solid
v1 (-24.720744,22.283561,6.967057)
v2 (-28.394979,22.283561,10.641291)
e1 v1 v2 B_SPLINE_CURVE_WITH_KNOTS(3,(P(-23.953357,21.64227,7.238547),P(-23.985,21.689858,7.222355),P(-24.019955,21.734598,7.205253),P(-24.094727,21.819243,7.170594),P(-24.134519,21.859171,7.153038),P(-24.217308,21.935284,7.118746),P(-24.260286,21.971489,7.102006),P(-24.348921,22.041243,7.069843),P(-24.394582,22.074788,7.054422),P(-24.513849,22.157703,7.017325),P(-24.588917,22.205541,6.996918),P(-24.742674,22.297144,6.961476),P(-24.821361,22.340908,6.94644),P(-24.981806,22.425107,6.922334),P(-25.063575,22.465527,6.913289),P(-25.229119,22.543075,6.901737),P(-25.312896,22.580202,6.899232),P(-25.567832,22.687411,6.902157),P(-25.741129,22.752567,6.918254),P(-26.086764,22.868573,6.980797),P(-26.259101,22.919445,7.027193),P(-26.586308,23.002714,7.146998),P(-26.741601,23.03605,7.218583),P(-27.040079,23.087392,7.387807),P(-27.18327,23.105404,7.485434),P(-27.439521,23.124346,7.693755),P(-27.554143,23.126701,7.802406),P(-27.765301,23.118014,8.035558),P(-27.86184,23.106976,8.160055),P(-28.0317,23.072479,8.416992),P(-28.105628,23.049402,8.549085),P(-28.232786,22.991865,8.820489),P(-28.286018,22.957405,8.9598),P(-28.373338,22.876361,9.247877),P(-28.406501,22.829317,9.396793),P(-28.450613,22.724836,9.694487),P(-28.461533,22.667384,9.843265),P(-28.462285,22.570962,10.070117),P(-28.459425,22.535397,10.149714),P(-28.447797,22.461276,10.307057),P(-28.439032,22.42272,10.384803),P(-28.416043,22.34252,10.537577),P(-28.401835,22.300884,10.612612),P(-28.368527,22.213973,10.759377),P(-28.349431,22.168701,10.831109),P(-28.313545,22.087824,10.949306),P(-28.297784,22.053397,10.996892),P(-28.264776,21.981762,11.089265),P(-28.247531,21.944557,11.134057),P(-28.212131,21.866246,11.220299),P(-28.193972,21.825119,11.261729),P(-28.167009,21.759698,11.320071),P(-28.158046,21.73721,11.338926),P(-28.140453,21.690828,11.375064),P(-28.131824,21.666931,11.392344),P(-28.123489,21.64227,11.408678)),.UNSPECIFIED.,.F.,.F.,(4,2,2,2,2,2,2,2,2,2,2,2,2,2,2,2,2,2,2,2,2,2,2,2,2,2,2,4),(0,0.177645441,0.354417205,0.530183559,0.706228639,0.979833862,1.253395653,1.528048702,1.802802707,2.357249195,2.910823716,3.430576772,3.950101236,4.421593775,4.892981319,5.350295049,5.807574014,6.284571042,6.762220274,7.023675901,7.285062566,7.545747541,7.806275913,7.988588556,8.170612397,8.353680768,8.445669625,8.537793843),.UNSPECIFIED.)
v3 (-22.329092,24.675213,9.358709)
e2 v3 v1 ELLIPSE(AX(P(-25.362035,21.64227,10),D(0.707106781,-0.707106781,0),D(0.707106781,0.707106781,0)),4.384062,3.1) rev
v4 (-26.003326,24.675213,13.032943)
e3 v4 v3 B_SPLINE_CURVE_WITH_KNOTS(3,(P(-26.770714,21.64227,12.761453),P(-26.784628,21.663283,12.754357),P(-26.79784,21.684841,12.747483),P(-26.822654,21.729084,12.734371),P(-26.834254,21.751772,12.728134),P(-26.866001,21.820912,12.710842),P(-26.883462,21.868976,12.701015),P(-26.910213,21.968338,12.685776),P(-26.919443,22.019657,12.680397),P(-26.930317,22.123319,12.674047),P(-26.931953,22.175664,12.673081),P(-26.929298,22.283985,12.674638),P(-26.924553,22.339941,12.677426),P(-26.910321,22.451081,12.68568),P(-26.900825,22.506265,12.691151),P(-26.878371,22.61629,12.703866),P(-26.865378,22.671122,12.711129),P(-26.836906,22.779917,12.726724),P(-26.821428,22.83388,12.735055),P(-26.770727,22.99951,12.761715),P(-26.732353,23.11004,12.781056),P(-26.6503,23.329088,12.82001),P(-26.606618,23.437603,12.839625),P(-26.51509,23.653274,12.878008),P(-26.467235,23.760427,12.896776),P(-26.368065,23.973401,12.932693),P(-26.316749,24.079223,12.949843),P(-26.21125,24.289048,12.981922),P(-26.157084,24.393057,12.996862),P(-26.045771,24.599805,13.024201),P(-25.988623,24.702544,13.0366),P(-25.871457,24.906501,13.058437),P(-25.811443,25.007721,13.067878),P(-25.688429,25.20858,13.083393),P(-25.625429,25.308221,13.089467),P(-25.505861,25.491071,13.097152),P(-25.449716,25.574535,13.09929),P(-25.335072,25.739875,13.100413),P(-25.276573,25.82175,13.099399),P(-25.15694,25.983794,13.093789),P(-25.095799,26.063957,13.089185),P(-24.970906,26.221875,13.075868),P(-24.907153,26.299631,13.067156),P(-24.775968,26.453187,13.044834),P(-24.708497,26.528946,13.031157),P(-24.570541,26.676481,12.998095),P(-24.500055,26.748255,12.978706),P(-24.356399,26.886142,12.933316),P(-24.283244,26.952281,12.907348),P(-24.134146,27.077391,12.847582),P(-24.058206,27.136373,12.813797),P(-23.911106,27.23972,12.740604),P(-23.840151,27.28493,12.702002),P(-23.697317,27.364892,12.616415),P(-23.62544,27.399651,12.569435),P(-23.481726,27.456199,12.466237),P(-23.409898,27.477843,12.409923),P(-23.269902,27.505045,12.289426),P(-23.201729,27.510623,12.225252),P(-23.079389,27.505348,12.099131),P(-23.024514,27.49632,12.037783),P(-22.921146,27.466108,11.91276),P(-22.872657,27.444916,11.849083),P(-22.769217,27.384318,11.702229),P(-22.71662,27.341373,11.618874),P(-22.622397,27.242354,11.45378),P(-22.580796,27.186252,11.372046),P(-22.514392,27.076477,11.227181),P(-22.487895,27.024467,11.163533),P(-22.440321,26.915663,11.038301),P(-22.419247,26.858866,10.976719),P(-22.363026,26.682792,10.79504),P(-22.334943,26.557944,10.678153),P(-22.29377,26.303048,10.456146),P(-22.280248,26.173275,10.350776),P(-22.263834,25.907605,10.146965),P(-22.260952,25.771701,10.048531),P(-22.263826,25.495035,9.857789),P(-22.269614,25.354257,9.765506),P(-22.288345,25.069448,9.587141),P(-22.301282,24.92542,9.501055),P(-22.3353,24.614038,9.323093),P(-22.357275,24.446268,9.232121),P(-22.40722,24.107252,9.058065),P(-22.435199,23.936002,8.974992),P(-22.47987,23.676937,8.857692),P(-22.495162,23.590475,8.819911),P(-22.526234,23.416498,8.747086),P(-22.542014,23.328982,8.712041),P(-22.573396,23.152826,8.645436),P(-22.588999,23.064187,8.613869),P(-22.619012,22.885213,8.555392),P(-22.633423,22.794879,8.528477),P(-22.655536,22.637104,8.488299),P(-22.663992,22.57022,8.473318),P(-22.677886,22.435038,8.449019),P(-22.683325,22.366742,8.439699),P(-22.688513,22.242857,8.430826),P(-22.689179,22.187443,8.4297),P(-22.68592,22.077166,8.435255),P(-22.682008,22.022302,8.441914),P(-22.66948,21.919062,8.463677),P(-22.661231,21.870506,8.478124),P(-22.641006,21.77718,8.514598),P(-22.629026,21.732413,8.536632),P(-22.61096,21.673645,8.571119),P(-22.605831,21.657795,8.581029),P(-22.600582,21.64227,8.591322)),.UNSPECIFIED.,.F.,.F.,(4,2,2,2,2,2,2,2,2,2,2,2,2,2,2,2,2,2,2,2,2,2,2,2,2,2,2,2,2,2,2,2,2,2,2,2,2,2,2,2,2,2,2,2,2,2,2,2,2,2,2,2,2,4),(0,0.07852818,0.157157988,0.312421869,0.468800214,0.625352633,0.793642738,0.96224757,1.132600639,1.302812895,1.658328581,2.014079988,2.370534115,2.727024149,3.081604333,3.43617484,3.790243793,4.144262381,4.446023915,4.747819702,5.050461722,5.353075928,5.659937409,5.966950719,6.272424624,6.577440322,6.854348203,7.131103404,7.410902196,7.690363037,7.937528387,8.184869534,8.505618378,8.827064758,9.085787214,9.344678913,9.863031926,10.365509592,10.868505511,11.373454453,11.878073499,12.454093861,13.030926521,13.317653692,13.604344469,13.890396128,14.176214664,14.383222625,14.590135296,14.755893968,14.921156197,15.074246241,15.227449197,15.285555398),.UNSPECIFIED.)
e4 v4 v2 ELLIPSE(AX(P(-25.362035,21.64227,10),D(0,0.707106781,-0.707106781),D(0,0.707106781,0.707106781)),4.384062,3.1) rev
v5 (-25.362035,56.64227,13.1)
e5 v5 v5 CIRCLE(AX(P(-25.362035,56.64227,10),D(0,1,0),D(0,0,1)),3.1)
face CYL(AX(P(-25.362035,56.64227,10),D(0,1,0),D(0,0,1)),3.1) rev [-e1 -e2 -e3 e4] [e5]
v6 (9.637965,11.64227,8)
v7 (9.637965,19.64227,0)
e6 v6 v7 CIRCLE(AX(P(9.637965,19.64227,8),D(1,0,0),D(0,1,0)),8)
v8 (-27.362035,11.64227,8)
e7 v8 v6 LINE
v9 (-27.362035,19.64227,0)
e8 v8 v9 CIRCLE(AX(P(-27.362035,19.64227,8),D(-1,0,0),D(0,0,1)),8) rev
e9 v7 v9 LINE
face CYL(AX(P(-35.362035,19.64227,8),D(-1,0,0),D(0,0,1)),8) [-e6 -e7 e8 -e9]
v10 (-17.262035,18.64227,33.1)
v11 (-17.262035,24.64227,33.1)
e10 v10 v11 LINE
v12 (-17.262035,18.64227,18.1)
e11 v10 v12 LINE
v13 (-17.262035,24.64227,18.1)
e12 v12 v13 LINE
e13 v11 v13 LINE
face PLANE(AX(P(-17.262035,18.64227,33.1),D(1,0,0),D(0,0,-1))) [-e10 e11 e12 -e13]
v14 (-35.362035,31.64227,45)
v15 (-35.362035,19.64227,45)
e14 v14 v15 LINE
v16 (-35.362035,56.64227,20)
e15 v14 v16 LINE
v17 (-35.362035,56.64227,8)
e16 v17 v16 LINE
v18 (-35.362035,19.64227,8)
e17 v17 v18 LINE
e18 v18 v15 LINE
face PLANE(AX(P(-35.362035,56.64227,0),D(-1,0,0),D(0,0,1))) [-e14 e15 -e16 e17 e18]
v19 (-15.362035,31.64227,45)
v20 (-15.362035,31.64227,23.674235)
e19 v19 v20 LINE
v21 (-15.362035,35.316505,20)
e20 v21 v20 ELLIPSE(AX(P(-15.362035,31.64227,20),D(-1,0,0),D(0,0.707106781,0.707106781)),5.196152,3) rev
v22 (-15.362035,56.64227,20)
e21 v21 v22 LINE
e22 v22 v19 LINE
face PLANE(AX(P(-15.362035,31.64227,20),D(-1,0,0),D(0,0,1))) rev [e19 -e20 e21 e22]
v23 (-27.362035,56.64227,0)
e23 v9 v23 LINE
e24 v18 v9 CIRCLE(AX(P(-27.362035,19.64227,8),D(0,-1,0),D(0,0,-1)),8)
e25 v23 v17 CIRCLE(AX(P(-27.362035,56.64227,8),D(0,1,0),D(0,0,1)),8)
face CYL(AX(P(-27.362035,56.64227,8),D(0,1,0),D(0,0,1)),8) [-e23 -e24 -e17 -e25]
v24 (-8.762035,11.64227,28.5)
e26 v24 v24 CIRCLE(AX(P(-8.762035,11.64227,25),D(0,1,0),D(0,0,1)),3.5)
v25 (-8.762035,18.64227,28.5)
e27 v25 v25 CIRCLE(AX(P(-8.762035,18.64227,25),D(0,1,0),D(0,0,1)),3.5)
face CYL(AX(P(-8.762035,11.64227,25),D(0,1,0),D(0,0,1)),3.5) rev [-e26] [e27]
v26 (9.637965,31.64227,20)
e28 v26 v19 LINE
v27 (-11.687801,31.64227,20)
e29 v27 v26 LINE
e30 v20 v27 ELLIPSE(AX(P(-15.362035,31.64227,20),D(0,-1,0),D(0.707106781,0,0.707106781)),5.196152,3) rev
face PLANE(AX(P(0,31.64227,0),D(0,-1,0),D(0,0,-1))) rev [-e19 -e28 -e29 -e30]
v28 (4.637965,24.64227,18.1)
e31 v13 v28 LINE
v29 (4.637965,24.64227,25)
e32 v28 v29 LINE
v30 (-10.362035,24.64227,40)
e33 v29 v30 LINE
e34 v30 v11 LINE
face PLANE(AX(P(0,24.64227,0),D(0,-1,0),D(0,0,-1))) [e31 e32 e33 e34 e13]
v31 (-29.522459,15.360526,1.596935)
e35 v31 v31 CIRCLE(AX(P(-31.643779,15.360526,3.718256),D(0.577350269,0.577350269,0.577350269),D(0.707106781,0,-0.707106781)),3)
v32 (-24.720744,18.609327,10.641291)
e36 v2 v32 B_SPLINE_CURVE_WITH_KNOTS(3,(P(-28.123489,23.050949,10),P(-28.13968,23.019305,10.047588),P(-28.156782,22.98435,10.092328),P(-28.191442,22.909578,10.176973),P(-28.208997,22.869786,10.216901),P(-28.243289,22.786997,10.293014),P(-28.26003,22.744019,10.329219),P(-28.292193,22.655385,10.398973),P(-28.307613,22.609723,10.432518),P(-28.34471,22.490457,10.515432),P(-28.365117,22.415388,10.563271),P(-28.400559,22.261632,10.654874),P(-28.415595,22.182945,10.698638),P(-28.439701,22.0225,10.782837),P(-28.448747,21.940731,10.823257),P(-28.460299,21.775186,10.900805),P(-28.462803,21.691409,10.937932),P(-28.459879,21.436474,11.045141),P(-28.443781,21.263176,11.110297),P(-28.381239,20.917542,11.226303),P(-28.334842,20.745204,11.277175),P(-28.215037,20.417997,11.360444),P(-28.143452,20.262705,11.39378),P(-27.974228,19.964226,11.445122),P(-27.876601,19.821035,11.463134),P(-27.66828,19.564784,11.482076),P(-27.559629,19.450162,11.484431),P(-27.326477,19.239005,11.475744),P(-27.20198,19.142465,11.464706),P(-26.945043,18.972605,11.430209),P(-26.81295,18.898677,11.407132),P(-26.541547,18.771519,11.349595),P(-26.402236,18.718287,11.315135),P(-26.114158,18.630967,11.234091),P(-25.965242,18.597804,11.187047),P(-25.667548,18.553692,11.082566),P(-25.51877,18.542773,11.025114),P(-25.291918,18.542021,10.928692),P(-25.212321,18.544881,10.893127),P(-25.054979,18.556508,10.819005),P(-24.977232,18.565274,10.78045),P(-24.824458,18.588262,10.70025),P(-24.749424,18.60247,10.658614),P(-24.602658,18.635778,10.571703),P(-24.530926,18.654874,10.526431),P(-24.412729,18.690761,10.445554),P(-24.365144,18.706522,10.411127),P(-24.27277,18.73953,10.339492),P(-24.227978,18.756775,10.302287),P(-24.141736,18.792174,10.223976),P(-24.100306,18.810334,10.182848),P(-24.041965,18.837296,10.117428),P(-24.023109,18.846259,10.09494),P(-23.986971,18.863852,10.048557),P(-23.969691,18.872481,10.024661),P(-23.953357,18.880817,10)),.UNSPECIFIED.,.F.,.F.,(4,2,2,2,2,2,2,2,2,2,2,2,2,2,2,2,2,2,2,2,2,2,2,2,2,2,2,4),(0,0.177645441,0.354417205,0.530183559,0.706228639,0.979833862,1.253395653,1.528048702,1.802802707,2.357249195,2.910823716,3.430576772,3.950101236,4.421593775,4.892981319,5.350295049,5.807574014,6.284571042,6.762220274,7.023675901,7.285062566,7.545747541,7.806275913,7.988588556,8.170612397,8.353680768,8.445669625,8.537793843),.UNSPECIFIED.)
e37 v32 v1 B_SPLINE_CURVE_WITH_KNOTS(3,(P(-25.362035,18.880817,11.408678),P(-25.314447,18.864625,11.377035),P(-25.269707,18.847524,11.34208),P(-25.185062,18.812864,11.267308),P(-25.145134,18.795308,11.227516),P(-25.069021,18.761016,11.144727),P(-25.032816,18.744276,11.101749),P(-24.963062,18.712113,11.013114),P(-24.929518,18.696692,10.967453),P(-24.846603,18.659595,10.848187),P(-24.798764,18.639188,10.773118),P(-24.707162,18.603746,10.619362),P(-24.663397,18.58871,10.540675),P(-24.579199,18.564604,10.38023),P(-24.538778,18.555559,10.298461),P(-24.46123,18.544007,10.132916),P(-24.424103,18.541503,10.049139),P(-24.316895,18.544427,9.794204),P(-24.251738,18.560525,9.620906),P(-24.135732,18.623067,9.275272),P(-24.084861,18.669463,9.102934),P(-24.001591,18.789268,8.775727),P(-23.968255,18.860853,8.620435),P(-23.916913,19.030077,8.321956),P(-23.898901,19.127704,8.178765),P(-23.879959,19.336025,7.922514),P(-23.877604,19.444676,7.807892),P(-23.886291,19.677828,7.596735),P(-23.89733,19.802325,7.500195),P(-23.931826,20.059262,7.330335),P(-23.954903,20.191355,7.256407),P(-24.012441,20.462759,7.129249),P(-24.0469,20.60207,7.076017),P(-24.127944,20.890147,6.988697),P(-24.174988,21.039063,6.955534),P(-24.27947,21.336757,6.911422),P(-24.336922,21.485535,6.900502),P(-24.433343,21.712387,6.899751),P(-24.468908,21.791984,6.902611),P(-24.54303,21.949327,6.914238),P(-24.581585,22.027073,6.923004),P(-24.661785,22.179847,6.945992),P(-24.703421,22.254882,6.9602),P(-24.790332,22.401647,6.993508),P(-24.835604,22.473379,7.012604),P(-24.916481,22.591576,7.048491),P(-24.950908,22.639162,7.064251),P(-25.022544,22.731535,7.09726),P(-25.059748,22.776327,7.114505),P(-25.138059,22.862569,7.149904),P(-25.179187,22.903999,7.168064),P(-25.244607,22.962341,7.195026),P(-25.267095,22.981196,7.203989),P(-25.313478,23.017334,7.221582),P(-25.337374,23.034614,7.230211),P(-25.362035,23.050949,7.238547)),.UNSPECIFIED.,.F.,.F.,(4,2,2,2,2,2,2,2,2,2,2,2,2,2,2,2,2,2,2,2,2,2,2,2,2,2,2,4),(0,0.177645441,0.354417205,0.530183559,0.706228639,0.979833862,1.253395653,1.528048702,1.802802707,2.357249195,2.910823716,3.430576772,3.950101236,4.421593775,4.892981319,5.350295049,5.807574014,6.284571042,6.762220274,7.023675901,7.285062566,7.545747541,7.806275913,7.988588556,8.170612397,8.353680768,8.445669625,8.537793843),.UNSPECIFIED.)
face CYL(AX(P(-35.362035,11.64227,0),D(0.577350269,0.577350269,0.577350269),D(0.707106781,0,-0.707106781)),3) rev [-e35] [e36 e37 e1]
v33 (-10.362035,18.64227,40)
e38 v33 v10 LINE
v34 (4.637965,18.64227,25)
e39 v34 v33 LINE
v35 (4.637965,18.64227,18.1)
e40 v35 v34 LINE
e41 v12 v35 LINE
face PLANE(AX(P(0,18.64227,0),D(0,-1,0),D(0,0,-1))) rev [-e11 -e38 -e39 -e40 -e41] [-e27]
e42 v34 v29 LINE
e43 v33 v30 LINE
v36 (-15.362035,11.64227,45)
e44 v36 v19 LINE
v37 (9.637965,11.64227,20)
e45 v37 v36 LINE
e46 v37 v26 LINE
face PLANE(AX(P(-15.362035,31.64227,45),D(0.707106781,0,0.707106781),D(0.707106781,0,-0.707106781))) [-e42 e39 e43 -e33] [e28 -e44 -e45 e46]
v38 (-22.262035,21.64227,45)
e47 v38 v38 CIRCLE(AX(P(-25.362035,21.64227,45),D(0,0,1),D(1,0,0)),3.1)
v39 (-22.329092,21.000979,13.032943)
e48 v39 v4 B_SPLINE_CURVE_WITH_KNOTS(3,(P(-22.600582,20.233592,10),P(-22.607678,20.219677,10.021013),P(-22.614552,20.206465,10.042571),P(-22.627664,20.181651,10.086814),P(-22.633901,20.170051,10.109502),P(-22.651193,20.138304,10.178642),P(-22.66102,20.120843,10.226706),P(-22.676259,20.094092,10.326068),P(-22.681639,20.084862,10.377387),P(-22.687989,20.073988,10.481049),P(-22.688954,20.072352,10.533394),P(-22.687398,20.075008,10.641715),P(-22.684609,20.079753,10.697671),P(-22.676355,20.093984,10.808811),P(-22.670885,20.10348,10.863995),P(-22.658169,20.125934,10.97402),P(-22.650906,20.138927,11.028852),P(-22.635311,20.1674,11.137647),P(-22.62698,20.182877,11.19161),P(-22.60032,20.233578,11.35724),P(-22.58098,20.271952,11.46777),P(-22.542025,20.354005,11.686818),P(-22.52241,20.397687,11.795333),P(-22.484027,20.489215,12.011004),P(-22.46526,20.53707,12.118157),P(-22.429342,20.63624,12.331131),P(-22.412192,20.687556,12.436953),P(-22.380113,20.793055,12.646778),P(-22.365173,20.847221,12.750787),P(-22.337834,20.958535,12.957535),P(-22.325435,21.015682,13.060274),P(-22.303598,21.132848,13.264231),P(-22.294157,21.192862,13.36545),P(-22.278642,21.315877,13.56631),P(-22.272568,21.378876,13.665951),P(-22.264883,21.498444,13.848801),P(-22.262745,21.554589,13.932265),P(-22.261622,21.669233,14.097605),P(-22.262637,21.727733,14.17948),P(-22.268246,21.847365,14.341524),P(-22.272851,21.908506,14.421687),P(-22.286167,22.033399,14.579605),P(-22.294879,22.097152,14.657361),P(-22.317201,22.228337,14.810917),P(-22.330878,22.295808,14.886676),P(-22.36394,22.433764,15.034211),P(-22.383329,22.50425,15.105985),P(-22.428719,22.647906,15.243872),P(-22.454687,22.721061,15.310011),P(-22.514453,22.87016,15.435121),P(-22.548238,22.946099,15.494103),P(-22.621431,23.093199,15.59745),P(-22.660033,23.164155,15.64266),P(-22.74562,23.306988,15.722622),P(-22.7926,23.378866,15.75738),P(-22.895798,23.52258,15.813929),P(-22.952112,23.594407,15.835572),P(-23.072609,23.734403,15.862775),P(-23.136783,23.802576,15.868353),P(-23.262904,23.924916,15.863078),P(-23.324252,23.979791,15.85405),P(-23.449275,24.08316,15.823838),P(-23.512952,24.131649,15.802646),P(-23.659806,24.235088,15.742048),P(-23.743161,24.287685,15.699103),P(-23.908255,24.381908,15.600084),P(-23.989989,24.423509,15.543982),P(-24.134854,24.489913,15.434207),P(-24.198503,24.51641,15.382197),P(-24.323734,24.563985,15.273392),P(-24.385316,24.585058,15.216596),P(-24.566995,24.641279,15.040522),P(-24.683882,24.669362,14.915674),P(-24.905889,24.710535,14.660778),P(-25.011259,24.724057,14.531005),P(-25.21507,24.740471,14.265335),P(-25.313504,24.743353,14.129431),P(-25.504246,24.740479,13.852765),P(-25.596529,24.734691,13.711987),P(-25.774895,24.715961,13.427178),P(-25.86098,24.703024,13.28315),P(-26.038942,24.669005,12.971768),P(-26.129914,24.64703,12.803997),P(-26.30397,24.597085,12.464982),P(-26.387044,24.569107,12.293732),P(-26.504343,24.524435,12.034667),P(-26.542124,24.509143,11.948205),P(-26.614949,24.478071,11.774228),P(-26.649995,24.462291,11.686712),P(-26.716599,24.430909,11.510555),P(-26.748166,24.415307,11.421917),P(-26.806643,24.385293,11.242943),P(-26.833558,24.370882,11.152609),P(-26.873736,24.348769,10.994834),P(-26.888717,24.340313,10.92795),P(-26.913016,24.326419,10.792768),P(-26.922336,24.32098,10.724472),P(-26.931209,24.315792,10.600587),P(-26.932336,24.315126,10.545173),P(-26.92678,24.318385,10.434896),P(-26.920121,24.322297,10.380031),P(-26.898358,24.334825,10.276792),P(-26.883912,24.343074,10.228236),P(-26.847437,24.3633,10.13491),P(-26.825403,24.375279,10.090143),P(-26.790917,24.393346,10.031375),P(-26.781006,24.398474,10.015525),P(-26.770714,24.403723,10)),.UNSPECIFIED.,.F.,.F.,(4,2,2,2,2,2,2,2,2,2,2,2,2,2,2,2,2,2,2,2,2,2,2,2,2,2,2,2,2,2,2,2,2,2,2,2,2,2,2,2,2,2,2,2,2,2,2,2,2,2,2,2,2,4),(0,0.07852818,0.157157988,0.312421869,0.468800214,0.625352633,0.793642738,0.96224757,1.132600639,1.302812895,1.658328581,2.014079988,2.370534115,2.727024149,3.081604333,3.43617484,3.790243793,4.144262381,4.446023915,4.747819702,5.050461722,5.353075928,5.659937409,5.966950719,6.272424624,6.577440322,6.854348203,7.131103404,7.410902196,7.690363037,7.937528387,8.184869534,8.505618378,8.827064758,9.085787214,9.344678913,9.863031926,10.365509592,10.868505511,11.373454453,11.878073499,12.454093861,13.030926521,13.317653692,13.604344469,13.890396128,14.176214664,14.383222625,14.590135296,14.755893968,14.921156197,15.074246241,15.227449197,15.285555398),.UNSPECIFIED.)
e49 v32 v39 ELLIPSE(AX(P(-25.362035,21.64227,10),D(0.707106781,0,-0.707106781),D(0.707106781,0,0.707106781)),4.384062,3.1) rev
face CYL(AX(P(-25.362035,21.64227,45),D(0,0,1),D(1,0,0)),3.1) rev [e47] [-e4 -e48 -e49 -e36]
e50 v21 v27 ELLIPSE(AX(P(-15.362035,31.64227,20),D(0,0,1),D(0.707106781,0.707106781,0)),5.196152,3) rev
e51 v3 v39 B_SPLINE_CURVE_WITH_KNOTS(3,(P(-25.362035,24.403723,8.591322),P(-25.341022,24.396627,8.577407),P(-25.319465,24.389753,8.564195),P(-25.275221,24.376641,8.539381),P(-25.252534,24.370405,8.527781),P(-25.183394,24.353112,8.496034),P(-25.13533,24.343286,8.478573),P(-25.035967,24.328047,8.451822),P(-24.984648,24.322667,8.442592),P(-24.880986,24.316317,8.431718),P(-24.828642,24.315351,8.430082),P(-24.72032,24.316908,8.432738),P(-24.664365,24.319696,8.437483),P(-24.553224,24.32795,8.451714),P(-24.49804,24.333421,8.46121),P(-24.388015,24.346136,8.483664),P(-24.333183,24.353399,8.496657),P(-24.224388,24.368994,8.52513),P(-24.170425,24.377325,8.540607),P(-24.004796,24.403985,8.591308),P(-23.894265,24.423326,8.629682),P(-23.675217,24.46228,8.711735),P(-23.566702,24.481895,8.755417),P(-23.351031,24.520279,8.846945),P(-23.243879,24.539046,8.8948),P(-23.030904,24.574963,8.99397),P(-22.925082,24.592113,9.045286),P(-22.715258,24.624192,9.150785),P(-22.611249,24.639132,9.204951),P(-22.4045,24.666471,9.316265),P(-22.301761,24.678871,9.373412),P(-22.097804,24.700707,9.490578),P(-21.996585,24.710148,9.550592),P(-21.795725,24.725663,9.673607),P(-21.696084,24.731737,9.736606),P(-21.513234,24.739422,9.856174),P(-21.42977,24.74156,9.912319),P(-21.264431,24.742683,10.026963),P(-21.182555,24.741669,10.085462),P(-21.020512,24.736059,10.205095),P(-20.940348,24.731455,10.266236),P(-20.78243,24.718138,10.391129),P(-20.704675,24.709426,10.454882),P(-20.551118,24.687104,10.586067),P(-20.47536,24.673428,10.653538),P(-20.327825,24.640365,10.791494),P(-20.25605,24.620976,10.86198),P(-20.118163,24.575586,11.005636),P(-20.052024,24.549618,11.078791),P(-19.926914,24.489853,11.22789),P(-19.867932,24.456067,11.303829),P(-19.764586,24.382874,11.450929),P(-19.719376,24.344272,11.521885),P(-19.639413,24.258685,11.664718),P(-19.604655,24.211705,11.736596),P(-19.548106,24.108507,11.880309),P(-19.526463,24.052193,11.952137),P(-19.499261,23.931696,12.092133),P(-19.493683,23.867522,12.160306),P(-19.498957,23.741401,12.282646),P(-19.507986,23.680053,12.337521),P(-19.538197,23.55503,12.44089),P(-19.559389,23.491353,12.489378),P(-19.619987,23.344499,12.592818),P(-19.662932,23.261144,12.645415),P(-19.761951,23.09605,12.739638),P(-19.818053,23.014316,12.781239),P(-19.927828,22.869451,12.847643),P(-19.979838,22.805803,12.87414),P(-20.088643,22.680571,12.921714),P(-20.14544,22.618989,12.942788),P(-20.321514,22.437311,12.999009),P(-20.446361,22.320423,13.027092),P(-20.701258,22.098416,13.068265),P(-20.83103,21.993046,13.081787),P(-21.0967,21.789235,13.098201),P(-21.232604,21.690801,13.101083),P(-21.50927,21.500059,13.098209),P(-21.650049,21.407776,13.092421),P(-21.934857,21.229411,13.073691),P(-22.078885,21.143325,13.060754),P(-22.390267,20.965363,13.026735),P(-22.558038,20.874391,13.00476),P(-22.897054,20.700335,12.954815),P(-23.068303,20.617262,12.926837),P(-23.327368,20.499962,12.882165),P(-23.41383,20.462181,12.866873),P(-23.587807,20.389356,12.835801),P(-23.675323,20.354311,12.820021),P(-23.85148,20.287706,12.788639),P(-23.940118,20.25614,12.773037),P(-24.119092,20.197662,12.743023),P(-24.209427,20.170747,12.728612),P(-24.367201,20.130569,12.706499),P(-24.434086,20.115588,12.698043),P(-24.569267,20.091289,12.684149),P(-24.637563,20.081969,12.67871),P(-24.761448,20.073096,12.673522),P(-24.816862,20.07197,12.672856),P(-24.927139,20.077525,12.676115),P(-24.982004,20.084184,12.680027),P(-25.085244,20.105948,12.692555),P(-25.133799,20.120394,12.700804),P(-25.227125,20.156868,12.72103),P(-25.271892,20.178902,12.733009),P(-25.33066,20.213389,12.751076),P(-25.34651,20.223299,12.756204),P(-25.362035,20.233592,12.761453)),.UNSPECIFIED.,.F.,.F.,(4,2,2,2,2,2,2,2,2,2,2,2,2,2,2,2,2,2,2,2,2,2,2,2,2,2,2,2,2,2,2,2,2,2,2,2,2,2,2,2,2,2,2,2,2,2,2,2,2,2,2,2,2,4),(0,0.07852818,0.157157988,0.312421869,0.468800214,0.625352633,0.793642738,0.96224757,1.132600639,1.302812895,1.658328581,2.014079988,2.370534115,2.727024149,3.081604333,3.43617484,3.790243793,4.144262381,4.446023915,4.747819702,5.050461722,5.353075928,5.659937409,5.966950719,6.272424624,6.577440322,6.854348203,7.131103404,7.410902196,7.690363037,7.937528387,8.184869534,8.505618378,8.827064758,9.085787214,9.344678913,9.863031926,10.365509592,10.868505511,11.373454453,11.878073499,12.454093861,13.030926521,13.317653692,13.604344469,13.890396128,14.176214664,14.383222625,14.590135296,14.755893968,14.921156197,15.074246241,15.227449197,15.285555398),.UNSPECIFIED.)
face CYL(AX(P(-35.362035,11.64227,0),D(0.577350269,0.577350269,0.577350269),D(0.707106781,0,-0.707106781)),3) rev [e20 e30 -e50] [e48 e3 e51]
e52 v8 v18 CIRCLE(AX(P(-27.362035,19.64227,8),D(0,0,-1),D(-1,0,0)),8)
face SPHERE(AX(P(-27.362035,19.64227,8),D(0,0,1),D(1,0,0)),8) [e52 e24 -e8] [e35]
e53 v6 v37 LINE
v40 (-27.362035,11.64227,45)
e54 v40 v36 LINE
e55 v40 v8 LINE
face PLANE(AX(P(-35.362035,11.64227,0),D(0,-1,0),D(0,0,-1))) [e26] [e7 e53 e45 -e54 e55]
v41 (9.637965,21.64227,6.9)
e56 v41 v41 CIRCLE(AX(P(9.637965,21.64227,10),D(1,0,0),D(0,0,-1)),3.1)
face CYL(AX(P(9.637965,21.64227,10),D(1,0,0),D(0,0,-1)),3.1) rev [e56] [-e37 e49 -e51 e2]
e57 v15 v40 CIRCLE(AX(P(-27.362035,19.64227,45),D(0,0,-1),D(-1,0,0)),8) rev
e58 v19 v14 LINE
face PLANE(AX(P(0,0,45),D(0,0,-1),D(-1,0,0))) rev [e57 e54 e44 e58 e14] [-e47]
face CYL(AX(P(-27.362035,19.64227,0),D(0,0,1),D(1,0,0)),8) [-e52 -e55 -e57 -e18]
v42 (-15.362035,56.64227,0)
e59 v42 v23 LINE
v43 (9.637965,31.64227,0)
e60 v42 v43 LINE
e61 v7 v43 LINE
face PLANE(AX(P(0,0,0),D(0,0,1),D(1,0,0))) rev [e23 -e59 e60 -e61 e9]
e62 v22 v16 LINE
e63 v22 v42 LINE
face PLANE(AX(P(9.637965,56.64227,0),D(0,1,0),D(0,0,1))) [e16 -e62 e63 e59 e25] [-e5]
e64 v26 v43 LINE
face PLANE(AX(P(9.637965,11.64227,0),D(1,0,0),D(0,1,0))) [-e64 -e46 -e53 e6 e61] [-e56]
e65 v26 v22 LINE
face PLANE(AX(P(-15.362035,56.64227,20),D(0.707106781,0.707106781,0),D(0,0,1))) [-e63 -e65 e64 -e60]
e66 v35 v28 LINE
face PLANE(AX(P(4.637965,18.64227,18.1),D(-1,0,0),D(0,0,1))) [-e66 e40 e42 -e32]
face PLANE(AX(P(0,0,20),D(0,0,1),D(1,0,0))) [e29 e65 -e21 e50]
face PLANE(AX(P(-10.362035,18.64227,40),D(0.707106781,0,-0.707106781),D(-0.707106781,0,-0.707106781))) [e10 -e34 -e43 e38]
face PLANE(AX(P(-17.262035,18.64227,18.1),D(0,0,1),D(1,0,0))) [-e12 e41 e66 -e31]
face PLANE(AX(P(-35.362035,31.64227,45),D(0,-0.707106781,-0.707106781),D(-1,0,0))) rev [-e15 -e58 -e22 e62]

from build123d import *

# Parameters (mm, degrees)
ESBO_O1_W                        = 45
ESBO_O1_H                        = 45
RESSALTO_EXTRUS_O1_DEPTH         = 20
ESBO_O2_W                        = 25
ESBO_O2_H                        = 25
CORTE_EXTRUS_O1_DEPTH            = 70.705238631
ESBO_O3_W                        = 20
ESBO_O3_H                        = 20
RESSALTO_EXTRUS_O2_DEPTH         = 25
FURO_DE_DI_METRO_6_2_6_2_1_D     = 6.2
FURO_DE_DI_METRO_6_2_6_2_1_DEPTH = 35
FURO_DE_DI_METRO_6_2_6_2_2_D     = 6.2
FURO_DE_DI_METRO_6_2_6_2_2_DEPTH = 35
FURO_DE_DI_METRO_6_2_6_2_3_D     = 6.2
FURO_DE_DI_METRO_6_2_6_2_3_DEPTH = 35
FILETE2_R                        = 8
CHANFRO1_SIZE                    = 25
CHANFRO2_SIZE                    = 25
RESSALTO_EXTRUS_O3_DEPTH         = 20
ESBO_O12_R                       = 3
CORTE_EXTRUS_O2_DEPTH            = 71.906960985
CORTE_EXTRUS_O5_DEPTH            = 3
CORTE_EXTRUS_O5_DEPTH_BACK       = 3
ESBO_O18_R                       = 3.5
CORTE_EXTRUS_O6_DEPTH            = 69.698424668


# Some blends are built 0.0001 mm under size
with BuildPart() as part:
    # Esboço1 → Ressalto-extrusão1 (new body)
    with BuildSketch(Plane.XY.offset(20)):
        with Locations((-12.862035225, 34.142270059)):
            Rectangle(ESBO_O1_W, ESBO_O1_H)
    extrude(amount=-RESSALTO_EXTRUS_O1_DEPTH)

    # Esboço2 → Corte-extrusão1 (cut, through all)
    with BuildSketch(Plane(origin=(0, 0, 0), x_dir=(-1, 0, 0), z_dir=(0, 0, -1))):
        with Locations((2.862035225, 44.142270059)):
            Rectangle(ESBO_O2_W, ESBO_O2_H)
    extrude(amount=-CORTE_EXTRUS_O1_DEPTH, mode=Mode.SUBTRACT)

    # Esboço3 → Ressalto-extrusão2 (add)
    with BuildSketch(Plane.XY.offset(20)):
        with Locations((-25.362035225, 21.642270059)):
            Rectangle(ESBO_O3_W, ESBO_O3_H)
    extrude(amount=RESSALTO_EXTRUS_O2_DEPTH)

    # Furo de diâmetro Ø6.2 (6.2)1
    with Locations(Plane(origin=(9.637964775, 0, 0), x_dir=(0, 0, -1), z_dir=(1, 0, 0))):
        with Locations((-10, 21.642270059)):
            Hole(FURO_DE_DI_METRO_6_2_6_2_1_D / 2, depth=FURO_DE_DI_METRO_6_2_6_2_1_DEPTH)

    # Furo de diâmetro Ø6.2 (6.2)2
    with Locations(Plane(origin=(0, 56.642270059, 0), x_dir=(1, 0, 0), z_dir=(0, 1, 0))):
        with Locations((-25.362035225, -10)):
            Hole(FURO_DE_DI_METRO_6_2_6_2_2_D / 2, depth=FURO_DE_DI_METRO_6_2_6_2_2_DEPTH)

    # Furo de diâmetro Ø6.2 (6.2)3
    with Locations(Plane.XY.offset(45)):
        with Locations((-25.362035225, 21.642270059)):
            Hole(FURO_DE_DI_METRO_6_2_6_2_3_D / 2, depth=FURO_DE_DI_METRO_6_2_6_2_3_DEPTH)

    # Filete2
    filete2_edges = [part.edges().sort_by_distance(p)[0] for p in [
        (-35.362035225, 34.142270059, 0),
        (-12.862035225, 11.642270059, 0),
        (-35.362035225, 11.642270059, 22.5),
    ]]
    fillet(filete2_edges, radius=FILETE2_R)

    # Chanfro1
    # the kernel refuses this chamfer: 25 mm, written as the material it adds along each edge
    with BuildSketch(Plane(origin=(-35.362035225, 31.642270059, 20), x_dir=(0, -0.027495876610586317, 0.9996219169112966), z_dir=(1, 0, 0))) as chanfro1_piece_1_section:
        Polygon((CHANFRO1_SIZE * 0.999621916911, -CHANFRO1_SIZE * 0.0274958766106), (-CHANFRO1_SIZE * 0.0274958766106, -CHANFRO1_SIZE * 0.999621916911), (0, 0), align=None)
    chanfro1_piece_1 = extrude(amount=20, mode=Mode.PRIVATE)
    chanfro1_piece_1 = split(chanfro1_piece_1, bisect_by=Plane(origin=(-25.362035225, 39.873368248, 45), z_dir=(0, 0, -1)), keep=Keep.TOP, mode=Mode.PRIVATE)
    chanfro1_piece_1 = split(chanfro1_piece_1, bisect_by=Plane(origin=(-25.362035225, 56.642270059, 28.231098189), z_dir=(0, -1, 0)), keep=Keep.TOP, mode=Mode.PRIVATE)
    add(chanfro1_piece_1)

    # Chanfro2
    chanfro2_edges = [part.edges().sort_by_distance(p)[0] for p in [
        (-15.362035225, 31.642270059, 10),
    ]]
    chamfer(chanfro2_edges, length=CHANFRO2_SIZE - 0.0001)  # a hair under: the kernel refuses the full size

    # Esboço10 → Ressalto-extrusão3 (add)
    with BuildSketch(Plane.XZ.offset(-11.642270059)):
        Polygon((-15.362035225, 45), (9.637964775, 20), (-15.362035225, 20), align=None)
    extrude(amount=-RESSALTO_EXTRUS_O3_DEPTH)

    # Esboço12 → Corte-extrusão2 (cut, through all)
    with BuildSketch(Plane(origin=(20.426744945, 20.426744945, 20.426744945), x_dir=(-0.8164965809277259, 0.408248290463863, 0.4082482904638632), z_dir=(-0.577350269189626, -0.5773502691896256, -0.5773502691896258))):
        with Locations(Location((33.625917704, 8.232328107, 0), (0, 0, 120.000005232))):
            Circle(ESBO_O12_R)
    extrude(amount=CORTE_EXTRUS_O2_DEPTH, mode=Mode.SUBTRACT)

    # Esboço16 → Corte-extrusão5 (cut, two sides: drawn at the far end of the back side and taken through both)
    with BuildSketch(Plane(origin=(0, 21.642270059, 0), x_dir=(-1, 0, 0), z_dir=(0, -1, 0)).offset(-CORTE_EXTRUS_O5_DEPTH_BACK)):
        Polygon((10.362035225, -40), (17.262035225, -33.1), (17.262035225, -18.1), (-4.637964775, -18.1), (-4.637964775, -25), align=None)
    extrude(amount=CORTE_EXTRUS_O5_DEPTH + CORTE_EXTRUS_O5_DEPTH_BACK, mode=Mode.SUBTRACT)

    # Esboço18 → Corte-extrusão6 (cut, through all)
    with BuildSketch(Plane(origin=(0, 18.642270059, 0), x_dir=(1, 0, 0), z_dir=(0, 1, 0))):
        with Locations(Location((-8.762035225, -25, 0), (0, 0, 270))):
            Circle(ESBO_O18_R)
    extrude(amount=-CORTE_EXTRUS_O6_DEPTH, mode=Mode.SUBTRACT)


solid = part.part
